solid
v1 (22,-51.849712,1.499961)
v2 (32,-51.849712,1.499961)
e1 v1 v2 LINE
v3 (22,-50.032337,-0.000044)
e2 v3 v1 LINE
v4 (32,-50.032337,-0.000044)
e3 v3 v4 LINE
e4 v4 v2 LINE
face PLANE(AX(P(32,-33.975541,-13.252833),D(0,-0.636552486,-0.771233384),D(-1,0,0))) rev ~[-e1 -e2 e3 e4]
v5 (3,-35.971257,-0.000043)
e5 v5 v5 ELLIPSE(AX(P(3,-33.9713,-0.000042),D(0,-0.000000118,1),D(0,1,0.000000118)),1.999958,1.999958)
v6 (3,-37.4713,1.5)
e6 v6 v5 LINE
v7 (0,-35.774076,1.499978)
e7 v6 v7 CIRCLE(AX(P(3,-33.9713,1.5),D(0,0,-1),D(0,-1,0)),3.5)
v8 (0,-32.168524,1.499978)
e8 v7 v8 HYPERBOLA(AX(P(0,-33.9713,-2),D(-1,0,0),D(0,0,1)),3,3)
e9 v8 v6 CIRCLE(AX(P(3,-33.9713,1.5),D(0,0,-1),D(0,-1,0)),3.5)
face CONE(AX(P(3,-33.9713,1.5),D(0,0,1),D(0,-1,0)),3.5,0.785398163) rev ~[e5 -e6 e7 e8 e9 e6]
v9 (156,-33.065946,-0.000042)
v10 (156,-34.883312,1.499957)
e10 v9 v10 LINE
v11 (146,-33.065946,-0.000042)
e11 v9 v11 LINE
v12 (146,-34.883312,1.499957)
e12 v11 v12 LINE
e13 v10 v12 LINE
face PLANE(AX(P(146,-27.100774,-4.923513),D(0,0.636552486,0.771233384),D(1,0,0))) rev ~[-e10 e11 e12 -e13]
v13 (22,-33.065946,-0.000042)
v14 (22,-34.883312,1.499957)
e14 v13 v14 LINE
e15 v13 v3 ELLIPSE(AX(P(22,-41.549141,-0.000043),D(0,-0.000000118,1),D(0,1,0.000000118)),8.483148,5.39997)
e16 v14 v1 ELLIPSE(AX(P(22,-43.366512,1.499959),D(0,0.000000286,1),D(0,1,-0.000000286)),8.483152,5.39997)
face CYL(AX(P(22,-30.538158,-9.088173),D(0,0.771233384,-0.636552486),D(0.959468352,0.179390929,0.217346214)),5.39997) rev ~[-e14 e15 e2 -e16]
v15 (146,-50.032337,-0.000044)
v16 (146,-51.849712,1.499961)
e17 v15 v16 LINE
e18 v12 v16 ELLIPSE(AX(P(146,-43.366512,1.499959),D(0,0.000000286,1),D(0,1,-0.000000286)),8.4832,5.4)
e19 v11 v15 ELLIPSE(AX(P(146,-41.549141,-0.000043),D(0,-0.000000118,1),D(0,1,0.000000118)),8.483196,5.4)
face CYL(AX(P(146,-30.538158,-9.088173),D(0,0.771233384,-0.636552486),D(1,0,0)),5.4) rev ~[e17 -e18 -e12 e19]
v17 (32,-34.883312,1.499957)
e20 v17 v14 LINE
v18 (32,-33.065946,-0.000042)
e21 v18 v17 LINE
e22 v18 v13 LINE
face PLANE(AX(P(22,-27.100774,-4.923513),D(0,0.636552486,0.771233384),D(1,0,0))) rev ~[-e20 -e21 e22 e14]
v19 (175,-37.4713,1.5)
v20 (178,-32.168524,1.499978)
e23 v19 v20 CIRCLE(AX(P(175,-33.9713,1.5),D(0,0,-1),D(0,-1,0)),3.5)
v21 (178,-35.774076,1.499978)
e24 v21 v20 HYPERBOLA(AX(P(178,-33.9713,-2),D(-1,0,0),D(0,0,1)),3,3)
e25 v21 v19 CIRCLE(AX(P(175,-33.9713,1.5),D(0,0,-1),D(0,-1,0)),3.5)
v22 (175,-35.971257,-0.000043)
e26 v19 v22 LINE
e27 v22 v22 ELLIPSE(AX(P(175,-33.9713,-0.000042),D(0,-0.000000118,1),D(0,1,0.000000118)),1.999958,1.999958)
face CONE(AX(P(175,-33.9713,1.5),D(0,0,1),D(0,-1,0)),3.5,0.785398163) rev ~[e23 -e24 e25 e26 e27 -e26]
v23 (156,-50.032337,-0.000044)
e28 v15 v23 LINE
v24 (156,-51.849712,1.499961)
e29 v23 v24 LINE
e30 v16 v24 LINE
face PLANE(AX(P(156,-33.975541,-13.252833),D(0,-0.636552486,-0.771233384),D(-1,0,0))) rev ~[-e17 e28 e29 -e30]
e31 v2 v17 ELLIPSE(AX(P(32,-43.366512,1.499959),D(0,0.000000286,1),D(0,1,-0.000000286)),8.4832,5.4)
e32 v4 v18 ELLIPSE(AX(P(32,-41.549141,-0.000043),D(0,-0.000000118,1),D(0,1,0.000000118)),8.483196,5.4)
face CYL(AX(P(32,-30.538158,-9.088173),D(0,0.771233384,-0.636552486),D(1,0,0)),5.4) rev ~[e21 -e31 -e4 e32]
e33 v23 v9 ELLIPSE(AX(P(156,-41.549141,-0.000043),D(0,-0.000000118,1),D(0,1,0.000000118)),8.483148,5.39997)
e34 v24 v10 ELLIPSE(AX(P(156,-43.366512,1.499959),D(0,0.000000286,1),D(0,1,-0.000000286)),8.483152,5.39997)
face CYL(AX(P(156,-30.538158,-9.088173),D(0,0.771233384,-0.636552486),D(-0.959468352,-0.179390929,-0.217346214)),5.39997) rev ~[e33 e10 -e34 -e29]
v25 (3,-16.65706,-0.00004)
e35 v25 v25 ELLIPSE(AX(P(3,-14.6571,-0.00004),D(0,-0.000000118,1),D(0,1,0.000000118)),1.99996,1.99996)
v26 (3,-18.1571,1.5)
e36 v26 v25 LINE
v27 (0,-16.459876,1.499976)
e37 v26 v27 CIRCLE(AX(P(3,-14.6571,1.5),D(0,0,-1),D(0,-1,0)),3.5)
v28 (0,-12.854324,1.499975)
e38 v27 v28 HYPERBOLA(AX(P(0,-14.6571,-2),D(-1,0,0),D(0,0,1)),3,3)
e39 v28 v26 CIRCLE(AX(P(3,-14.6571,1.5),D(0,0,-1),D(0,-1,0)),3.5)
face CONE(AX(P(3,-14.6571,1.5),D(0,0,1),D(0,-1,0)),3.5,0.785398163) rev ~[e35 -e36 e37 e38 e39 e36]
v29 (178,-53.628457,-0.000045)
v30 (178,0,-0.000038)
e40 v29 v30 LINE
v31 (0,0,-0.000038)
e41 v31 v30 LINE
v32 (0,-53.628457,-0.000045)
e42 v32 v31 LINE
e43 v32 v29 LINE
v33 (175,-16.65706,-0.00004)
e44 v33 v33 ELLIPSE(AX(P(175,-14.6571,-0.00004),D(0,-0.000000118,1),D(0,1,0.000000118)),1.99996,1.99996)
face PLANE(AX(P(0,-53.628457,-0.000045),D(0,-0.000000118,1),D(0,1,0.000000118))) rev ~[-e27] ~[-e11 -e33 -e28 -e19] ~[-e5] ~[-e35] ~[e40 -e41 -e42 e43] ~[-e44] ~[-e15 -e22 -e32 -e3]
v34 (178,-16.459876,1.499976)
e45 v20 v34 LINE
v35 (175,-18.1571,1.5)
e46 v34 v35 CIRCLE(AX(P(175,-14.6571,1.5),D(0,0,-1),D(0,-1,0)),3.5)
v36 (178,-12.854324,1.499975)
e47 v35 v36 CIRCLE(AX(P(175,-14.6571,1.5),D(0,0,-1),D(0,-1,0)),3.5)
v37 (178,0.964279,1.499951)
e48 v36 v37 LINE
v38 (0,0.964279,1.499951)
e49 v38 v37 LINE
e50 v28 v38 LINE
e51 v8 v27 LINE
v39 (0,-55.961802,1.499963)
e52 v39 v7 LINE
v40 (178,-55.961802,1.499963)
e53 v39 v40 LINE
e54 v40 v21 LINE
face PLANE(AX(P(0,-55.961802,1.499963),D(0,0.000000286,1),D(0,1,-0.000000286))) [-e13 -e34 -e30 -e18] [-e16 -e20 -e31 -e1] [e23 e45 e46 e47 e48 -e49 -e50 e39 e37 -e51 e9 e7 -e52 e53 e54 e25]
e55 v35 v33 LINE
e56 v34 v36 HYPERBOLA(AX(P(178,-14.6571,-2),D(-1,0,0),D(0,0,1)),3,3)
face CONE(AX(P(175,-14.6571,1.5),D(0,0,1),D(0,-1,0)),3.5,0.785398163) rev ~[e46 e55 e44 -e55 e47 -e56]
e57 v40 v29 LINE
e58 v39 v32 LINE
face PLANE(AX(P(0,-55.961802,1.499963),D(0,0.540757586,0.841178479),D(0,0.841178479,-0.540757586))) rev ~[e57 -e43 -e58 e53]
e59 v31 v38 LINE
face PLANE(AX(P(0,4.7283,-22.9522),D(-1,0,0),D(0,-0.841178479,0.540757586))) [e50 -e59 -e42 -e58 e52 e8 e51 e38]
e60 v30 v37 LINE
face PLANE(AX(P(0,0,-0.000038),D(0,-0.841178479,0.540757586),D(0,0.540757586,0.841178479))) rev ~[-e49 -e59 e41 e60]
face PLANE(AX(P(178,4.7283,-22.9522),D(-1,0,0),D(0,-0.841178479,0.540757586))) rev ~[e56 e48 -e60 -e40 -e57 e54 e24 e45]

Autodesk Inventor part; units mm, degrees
ref_plane "YZ Plane" through (0, 0, 0) normal (1, 0, 0) x (0, 1, 0)
ref_plane "XZ Plane" through (0, 0, 0) normal (0, 1, 0) x (-1, 0, 0)
ref_plane "Work Plane1" through (0, 4.7283, -22.9522) normal (-1, 0, 0) x (0, -0.8411785, 0.5407576)
sketch "Sketch1" plane through (0, 4.7283, -22.9522) normal (-1, 0, 0) x (0, -0.8411785, 0.5407576)
  line L0 (-34.301, -16.75) -> (61.5, -16.75) projected
  line L1 (61.5, -12.25) -> (61.5, -16.75) projected
  line L2 (61.5, -16.75) -> (65.5, -16.75) projected
  line L3 (65.5, -16.75) -> (65.5, -20.25) projected
  line L4 (65.5, -20.25) -> (79.5, -20.25) projected
  line L5 (79.5, -20.25) -> (65.5, -11.25) projected
  line L6 (65.5, -11.25) -> (65.5, -12.25) projected
  line L7 (65.5, -12.25) -> (61.5, -12.25) projected
  line L8 (16.3889, 16.75) -> (16.3889, 18.75) projected
  line L9 (14.3494, 18.75) -> (16.3889, 18.75)
  line L10 (64.2739, -12.25) -> (12.3502, 21.1295)
  line L11 (16.3889, 16.75) -> (16.3889, 18.5332)
  arc A0 (-57.551, -16.75) -> (-61.5, -12.801) centre (-58.75, -14) ccw projected
  line L12 (-57.551, -16.75) -> (-36.699, -16.75) projected
  arc A1 (-34.301, -16.75) -> (-36.699, -16.75) centre (-35.5, -14) ccw projected
  line L13 (-34.301, -16.75) -> (61.5, -16.75) projected
  line L14 (61.5, -16.75) -> (61.5, -12.25) projected
  line L15 (61.5, -12.25) -> (16.3889, 16.75) projected
  line L16 (16.3889, 16.75) -> (-61.5, 16.75) projected
  line L17 (-61.5, 16.75) -> (-61.5, -12.801) projected
  line L18 (-61.5, 16.75) -> (-61.5, -12.801) projected
  arc A2 (-57.551, -16.75) -> (-61.5, -12.801) centre (-58.75, -14) ccw projected
  line L19 (-57.551, -16.75) -> (-36.699, -16.75) projected
  arc A3 (-34.301, -16.75) -> (-36.699, -16.75) centre (-35.5, -14) ccw projected
  line L20 (61.5, -16.75) -> (61.5, -12.25) projected
  line L21 (61.5, -12.25) -> (16.3889, 16.75) projected
  line L22 (16.3889, 16.75) -> (-61.5, 16.75) projected
  point P0 (16.3889, 18.5332)
  point P1 (15.3691, 18.75)
  point P2 (16.3889, 18.5332)
  point P3 (16.0517, 18.75)
  dimension "d14" = 1.5
  dimension "d15" = 2
ref_plane "Work Plane2" through (178, -56.0619, -70.2985) normal (1, 0, 0) x (0, 0.8411785, -0.5407576)
extrude "Extrusion1" add sketch "Sketch1" against normal up to surface (178 mm away) contours L15 L8 L10 L7
sketch "Sketch2" plane through (0, -55.9618, 1.5) normal (0, 0, 1) x (1, 0, 0)
  circle A0 centre (3, 21.9904) radius 2.5 projected
  circle A1 centre (3, 41.3047) radius 2.5 projected
  line L0 (0, 2.3333) -> (0, 55.9618) projected
  line L1 (0, 2.3333) -> (6, 2.3333) projected
  line L2 (6, 55.9618) -> (6, 2.3333) projected
  line L3 (0, 55.9618) -> (6, 55.9618) projected
  circle A2 centre (175, 21.9904) radius 2.5 projected
  circle A3 centre (175, 41.3047) radius 2.5 projected
  line L4 (178, 2.3333) -> (178, 55.9618) projected
  line L5 (178, 55.9618) -> (172, 55.9618) projected
  line L6 (172, 55.9618) -> (172, 2.3333) projected
  line L7 (178, 2.3333) -> (172, 2.3333) projected
hole "Hole1" at (3, -14.6571, 1.5) at (3, -33.9713, 1.5) at (175, -33.9713, 1.5) at (175, -14.6571, 1.5) direction (0, 0, -1) diameter 3.6 end through all countersink diameter 7 countersink angle 90 clearance for "Countersunk Flat Head Screw ISO 2009/7046" size "M3" standard "ISO"
ref_plane "Work Plane3" through (22, -30.5397, -9.0869) normal (0, -0.7712334, 0.6365525) x (1, 0, 0)
sketch "Sketch3" plane through (22, -30.5397, -9.0869) normal (0, -0.7712334, 0.6365525) x (1, 0, 0)
  line L0 (-9.9215, 5.4518) -> (-9.9215, -5.4534)
  spline S0 degree 3 poles (-9.9215, -5.4534) (-9.9222, -5.5772) (-9.8204, -5.8209) (-9.5772, -5.9222) (-9.4534, -5.9215) knots 0 0 0 0 0.5 1 1 1 1
  line L1 (-9.4534, -5.9215) -> (19.4534, -5.9215)
  spline S1 degree 3 poles (19.4534, -5.9215) (19.5775, -5.9222) (19.8219, -5.82) (19.9222, -5.5758) (19.9215, -5.4518) knots 0 0 0 0 0.5 1 1 1 1
  line L2 (19.9215, -5.4518) -> (19.9215, 5.4534)
  spline S2 degree 3 poles (19.9215, 5.4534) (19.9222, 5.5775) (19.82, 5.8219) (19.5758, 5.9222) (19.4518, 5.9215) knots 0 0 0 0 0.5 1 1 1 1
  line L3 (19.4518, 5.9215) -> (-9.4534, 5.9215)
  spline S3 degree 3 poles (-9.4534, 5.9215) (-9.5775, 5.9222) (-9.8219, 5.82) (-9.9222, 5.5758) (-9.9215, 5.4518) knots 0 0 0 0 0.5 1 1 1 1
  circle A0 centre (-8.3791, -4.3791) radius 0.5
  circle A1 centre (-8.3791, 4.3791) radius 0.5
  circle A2 centre (18.3791, 4.3791) radius 0.5
  circle A3 centre (18.3791, -4.3791) radius 0.5
  arc A4 (5.2617, -1.4512) -> (5.1811, -1.5218) centre (5.2771, -1.55) ccw
  arc A5 (5.1811, 1.5218) -> (5.1811, -1.5218) centre (0, 0) ccw
  arc A6 (5.1811, 1.5218) -> (5.2617, 1.4512) centre (5.2771, 1.55) ccw
  arc A7 (5.2617, 1.4512) -> (5.3414, 1.519) centre (5.2463, 1.55) ccw
  arc A8 (5.3414, -1.519) -> (5.3414, 1.519) centre (10, 0) ccw
  arc A9 (5.3414, -1.519) -> (5.2617, -1.4512) centre (5.2463, -1.55) ccw
  line L4 (143.9215, 5.4518) -> (143.9215, -5.4534)
  spline S4 degree 3 poles (143.4534, 5.9215) (143.5775, 5.9222) (143.8219, 5.82) (143.9222, 5.5758) (143.9215, 5.4518) knots 0 0 0 0 0.5 1 1 1 1
  line L5 (114.5482, 5.9215) -> (143.4534, 5.9215)
  spline S5 degree 3 poles (114.0785, 5.4534) (114.0778, 5.5775) (114.18, 5.8219) (114.4242, 5.9222) (114.5482, 5.9215) knots 0 0 0 0 0.5 1 1 1 1
  line L6 (114.0785, -5.4518) -> (114.0785, 5.4534)
  spline S6 degree 3 poles (114.5466, -5.9215) (114.4225, -5.9222) (114.1781, -5.82) (114.0778, -5.5758) (114.0785, -5.4518) knots 0 0 0 0 0.5 1 1 1 1
  line L7 (143.4534, -5.9215) -> (114.5466, -5.9215)
  spline S7 degree 3 poles (143.9215, -5.4534) (143.9222, -5.5772) (143.8204, -5.8209) (143.5772, -5.9222) (143.4534, -5.9215) knots 0 0 0 0 0.5 1 1 1 1
  circle A10 centre (142.3791, -4.3791) radius 0.5
  circle A11 centre (142.3791, 4.3791) radius 0.5
  circle A12 centre (115.6209, 4.3791) radius 0.5
  circle A13 centre (115.6209, -4.3791) radius 0.5
  arc A14 (128.8189, -1.5218) -> (128.7383, -1.4512) centre (128.7229, -1.55) ccw
  arc A15 (128.7383, -1.4512) -> (128.6586, -1.519) centre (128.7537, -1.55) ccw
  arc A16 (128.6586, 1.519) -> (128.6586, -1.519) centre (124, 0) ccw
  arc A17 (128.6586, 1.519) -> (128.7383, 1.4512) centre (128.7537, 1.55) ccw
  arc A18 (128.7383, 1.4512) -> (128.8189, 1.5218) centre (128.7229, 1.55) ccw
  arc A19 (128.8189, -1.5218) -> (128.8189, 1.5218) centre (134, 0) ccw
  circle A20 centre (10, 0) radius 5.4
  circle A21 centre (124, 0) radius 5.4
  line L8 (0, 5.4) -> (10, 5.4)
  line L9 (10, -5.4) -> (0, -5.4)
  line L10 (124, 5.4) -> (134, 5.4)
  line L11 (134, -5.4) -> (124, -5.4)
  point P0 (-22, 26.4483)
  dimension "d9" = 10.8
  dimension "d10" = 10.8
extrude "Extrusion2" cut sketch "Sketch3" along normal blind 78.25 contours A9 A8 A7 A6 A5 A20 A4 | A4 A5 A20 A6 A7 A8 A9 | A20 L9 A5 | A5 A20 | A5 L8 A20 | A19 A21 A18 A17 A16 A15 A14 | A14 A15 A16 A17 A18 A19 A21 | A21 A19 | A19 L11 A21 | A19 A21 L10
properties part number "front" material "Aluminum 6061"
